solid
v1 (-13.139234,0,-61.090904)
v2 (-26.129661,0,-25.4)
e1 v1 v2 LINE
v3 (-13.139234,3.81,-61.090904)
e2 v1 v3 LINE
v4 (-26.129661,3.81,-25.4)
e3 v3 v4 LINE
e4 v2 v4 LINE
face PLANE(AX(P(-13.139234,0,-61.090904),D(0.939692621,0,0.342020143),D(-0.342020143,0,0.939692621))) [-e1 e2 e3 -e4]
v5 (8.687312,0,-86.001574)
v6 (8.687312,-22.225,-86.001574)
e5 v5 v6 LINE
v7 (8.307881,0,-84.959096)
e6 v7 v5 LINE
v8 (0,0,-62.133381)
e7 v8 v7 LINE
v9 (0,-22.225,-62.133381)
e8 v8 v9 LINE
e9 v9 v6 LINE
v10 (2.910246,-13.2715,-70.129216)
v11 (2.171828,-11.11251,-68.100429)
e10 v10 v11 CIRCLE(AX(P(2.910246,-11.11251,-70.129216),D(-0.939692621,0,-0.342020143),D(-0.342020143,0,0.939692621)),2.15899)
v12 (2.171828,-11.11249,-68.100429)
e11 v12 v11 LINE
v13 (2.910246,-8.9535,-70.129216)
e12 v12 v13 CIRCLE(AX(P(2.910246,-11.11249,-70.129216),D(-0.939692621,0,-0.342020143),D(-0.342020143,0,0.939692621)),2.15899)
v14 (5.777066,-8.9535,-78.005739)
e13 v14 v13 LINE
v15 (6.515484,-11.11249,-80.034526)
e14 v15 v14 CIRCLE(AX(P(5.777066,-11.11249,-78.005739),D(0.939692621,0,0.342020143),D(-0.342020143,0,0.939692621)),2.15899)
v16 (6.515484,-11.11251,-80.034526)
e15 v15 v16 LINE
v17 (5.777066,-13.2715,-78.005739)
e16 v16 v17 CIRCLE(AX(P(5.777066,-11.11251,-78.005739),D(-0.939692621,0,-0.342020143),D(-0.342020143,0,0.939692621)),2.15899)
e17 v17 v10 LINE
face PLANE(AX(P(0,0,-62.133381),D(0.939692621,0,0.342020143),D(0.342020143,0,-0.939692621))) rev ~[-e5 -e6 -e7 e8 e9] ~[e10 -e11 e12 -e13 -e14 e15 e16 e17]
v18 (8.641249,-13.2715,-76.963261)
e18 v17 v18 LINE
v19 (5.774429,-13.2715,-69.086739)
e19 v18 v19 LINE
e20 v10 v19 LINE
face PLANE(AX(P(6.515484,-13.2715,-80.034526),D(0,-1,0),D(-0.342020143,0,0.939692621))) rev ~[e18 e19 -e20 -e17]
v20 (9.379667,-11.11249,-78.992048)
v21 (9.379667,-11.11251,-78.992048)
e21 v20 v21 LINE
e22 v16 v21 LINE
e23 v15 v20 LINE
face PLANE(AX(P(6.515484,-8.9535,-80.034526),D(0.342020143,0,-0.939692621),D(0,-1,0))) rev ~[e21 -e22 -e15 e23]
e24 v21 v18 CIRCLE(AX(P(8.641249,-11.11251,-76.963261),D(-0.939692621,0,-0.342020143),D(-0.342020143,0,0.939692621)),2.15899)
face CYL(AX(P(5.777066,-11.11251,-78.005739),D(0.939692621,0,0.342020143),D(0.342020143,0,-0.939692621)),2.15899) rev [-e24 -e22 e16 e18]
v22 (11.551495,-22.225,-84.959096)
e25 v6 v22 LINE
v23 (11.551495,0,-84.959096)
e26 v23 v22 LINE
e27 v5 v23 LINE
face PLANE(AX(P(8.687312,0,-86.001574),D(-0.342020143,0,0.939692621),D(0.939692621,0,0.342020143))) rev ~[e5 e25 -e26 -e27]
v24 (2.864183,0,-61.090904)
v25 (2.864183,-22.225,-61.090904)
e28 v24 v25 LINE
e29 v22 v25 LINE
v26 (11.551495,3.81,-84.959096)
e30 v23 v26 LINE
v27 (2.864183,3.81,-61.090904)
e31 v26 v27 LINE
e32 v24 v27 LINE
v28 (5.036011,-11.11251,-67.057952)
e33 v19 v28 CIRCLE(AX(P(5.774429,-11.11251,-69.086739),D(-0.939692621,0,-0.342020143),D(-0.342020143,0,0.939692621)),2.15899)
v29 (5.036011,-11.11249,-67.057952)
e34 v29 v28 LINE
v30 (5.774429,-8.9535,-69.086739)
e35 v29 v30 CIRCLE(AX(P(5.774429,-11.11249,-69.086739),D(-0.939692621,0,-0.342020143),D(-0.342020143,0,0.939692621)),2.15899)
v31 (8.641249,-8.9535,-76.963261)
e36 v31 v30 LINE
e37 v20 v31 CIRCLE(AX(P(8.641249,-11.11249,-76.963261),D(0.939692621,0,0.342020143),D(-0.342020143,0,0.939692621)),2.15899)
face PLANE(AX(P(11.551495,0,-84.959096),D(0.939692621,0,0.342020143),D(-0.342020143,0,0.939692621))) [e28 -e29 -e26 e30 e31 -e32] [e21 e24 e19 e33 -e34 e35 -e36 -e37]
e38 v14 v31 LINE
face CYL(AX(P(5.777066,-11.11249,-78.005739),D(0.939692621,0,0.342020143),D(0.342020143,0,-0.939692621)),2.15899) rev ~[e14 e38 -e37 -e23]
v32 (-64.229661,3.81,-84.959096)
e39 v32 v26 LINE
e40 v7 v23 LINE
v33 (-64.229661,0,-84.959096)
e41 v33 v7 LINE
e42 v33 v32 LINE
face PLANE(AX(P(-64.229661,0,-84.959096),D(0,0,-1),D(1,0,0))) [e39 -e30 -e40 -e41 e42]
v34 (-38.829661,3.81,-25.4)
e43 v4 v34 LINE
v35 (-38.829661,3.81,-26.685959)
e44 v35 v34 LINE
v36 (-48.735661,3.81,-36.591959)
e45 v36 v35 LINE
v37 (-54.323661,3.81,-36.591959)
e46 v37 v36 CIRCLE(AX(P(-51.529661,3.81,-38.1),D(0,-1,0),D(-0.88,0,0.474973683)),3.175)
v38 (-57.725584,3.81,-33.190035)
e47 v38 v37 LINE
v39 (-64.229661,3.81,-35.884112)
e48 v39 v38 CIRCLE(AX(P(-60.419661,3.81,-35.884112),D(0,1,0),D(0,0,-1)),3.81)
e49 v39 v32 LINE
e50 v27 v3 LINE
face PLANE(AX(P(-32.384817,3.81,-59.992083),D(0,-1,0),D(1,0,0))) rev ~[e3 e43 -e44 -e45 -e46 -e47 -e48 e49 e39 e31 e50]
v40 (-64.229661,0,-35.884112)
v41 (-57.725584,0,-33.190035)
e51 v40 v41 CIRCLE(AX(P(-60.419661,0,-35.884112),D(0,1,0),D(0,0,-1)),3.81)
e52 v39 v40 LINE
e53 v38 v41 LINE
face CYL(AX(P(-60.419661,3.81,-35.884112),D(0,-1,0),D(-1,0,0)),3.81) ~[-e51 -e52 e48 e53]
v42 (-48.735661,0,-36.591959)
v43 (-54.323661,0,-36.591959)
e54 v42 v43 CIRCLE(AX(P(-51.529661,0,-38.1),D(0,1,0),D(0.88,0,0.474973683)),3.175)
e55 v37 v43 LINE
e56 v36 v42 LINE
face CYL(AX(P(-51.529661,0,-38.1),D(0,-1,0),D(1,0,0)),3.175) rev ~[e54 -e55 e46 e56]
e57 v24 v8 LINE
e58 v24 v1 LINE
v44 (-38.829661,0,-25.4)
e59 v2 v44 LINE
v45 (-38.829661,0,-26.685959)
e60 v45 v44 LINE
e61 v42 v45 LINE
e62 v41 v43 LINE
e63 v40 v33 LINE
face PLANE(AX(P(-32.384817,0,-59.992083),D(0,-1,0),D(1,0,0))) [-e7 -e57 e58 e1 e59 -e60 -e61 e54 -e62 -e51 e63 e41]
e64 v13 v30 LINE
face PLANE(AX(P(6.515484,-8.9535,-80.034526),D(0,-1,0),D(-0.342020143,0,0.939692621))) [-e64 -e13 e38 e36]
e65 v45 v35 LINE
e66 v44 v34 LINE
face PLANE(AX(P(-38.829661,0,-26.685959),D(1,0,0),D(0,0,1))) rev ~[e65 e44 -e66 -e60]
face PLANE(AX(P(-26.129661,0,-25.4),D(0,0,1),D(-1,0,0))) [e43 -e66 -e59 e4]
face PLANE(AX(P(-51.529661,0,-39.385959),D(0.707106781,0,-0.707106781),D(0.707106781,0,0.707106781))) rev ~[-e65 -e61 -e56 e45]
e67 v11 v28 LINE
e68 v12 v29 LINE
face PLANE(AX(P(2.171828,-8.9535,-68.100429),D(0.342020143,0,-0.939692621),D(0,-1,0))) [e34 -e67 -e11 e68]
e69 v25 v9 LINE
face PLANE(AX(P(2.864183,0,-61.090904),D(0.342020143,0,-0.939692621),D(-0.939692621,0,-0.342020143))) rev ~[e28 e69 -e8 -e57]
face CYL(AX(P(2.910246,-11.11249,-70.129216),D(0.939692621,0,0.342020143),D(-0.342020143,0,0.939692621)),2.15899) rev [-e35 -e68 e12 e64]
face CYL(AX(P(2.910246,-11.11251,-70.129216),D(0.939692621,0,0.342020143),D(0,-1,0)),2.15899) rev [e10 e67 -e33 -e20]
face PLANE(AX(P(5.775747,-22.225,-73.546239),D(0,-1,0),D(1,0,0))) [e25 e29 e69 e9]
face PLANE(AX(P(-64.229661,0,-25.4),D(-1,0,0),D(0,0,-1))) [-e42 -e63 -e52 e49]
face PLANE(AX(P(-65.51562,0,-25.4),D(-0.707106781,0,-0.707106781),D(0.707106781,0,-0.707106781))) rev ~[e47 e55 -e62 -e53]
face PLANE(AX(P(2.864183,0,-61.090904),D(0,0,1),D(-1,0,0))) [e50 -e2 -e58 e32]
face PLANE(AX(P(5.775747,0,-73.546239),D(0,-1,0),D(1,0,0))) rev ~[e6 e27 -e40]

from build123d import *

# Parameters (mm, degrees)
F1_DEPTH = 22.225
F2_W     = 4.318
F2_H     = 12.7
F3_DEPTH = 11.212402643
F4_R     = 2.15899
F5_R     = 3.175
F6_DEPTH = 3.81
F8_DEPTH = 25.4
F9_R     = 3.81


# Not quite as in the source:
# - a fillet or chamfer is up to 0.001 mm smaller than in the source, because OpenCascade refuses the exact size


with BuildPart() as f1:
    # F0 (on Front) → F1 (new body)
    with BuildSketch(Plane.XZ):
        Polygon((11.5514947486, -84.959096284), (2.8641831082, -61.090903716), (0, -62.1333811129), (8.6873116405, -86.0015736808), align=None)
    extrude(amount=F1_DEPTH)

    # F2 (on face) → F3 (cut, through all)
    with BuildSketch(Plane(origin=(-19.9692837636, 0, -7.2682248896), x_dir=(0, -1, 0), z_dir=(-0.9396926208, 0, -0.3420201433))):
        with Locations((11.1125, -71.0862797362)):
            Rectangle(F2_W, F2_H)
        with Locations((11.1125, -93.3112797362)):
            Rectangle(F2_W, F2_H)
    extrude(amount=-F3_DEPTH, mode=Mode.SUBTRACT)

    # F4 (radius 2.159 in the source; OpenCascade refuses exactly that, so slightly less here)
    f4_edges = [f1.edges().sort_by_distance(p)[0] for p in [
        (3.603919, -8.9535, -67.579191),
        (3.603919, -13.2715, -67.579191),
        (7.947575, -13.2715, -79.513287),
        (7.947575, -8.9535, -79.513287),
    ]]
    fillet(f4_edges, radius=F4_R)

    # F5 (on Front) → F6 (join)
    with BuildSketch(Plane.XZ):
        Polygon((11.5514947486, -84.959096284), (2.8641831082, -61.090903716), (-13.1392344849, -61.090903716), (-26.1296610716, -25.4), (-64.2296610716, -25.4), (-64.2296610716, -84.959096284), align=None)
        with Locations((-51.5296610716, -38.1)):
            Circle(F5_R, mode=Mode.SUBTRACT)
    extrude(amount=-F6_DEPTH)

    # F7 (on Front) → F8 (cut)
    with BuildSketch(Plane.XZ):
        Polygon((-65.5156196266, -25.4), (-51.5296610716, -39.3859585549), (-38.8296610716, -26.6859585549), (-38.8296610716, -25.4), align=None)
    extrude(amount=-F8_DEPTH, mode=Mode.SUBTRACT)

    # F9
    f9_edges = [f1.edges().sort_by_distance(p)[0] for p in [
        (-64.229661, 1.905, -26.685959),
    ]]
    fillet(f9_edges, radius=F9_R)


solid = f1.part
